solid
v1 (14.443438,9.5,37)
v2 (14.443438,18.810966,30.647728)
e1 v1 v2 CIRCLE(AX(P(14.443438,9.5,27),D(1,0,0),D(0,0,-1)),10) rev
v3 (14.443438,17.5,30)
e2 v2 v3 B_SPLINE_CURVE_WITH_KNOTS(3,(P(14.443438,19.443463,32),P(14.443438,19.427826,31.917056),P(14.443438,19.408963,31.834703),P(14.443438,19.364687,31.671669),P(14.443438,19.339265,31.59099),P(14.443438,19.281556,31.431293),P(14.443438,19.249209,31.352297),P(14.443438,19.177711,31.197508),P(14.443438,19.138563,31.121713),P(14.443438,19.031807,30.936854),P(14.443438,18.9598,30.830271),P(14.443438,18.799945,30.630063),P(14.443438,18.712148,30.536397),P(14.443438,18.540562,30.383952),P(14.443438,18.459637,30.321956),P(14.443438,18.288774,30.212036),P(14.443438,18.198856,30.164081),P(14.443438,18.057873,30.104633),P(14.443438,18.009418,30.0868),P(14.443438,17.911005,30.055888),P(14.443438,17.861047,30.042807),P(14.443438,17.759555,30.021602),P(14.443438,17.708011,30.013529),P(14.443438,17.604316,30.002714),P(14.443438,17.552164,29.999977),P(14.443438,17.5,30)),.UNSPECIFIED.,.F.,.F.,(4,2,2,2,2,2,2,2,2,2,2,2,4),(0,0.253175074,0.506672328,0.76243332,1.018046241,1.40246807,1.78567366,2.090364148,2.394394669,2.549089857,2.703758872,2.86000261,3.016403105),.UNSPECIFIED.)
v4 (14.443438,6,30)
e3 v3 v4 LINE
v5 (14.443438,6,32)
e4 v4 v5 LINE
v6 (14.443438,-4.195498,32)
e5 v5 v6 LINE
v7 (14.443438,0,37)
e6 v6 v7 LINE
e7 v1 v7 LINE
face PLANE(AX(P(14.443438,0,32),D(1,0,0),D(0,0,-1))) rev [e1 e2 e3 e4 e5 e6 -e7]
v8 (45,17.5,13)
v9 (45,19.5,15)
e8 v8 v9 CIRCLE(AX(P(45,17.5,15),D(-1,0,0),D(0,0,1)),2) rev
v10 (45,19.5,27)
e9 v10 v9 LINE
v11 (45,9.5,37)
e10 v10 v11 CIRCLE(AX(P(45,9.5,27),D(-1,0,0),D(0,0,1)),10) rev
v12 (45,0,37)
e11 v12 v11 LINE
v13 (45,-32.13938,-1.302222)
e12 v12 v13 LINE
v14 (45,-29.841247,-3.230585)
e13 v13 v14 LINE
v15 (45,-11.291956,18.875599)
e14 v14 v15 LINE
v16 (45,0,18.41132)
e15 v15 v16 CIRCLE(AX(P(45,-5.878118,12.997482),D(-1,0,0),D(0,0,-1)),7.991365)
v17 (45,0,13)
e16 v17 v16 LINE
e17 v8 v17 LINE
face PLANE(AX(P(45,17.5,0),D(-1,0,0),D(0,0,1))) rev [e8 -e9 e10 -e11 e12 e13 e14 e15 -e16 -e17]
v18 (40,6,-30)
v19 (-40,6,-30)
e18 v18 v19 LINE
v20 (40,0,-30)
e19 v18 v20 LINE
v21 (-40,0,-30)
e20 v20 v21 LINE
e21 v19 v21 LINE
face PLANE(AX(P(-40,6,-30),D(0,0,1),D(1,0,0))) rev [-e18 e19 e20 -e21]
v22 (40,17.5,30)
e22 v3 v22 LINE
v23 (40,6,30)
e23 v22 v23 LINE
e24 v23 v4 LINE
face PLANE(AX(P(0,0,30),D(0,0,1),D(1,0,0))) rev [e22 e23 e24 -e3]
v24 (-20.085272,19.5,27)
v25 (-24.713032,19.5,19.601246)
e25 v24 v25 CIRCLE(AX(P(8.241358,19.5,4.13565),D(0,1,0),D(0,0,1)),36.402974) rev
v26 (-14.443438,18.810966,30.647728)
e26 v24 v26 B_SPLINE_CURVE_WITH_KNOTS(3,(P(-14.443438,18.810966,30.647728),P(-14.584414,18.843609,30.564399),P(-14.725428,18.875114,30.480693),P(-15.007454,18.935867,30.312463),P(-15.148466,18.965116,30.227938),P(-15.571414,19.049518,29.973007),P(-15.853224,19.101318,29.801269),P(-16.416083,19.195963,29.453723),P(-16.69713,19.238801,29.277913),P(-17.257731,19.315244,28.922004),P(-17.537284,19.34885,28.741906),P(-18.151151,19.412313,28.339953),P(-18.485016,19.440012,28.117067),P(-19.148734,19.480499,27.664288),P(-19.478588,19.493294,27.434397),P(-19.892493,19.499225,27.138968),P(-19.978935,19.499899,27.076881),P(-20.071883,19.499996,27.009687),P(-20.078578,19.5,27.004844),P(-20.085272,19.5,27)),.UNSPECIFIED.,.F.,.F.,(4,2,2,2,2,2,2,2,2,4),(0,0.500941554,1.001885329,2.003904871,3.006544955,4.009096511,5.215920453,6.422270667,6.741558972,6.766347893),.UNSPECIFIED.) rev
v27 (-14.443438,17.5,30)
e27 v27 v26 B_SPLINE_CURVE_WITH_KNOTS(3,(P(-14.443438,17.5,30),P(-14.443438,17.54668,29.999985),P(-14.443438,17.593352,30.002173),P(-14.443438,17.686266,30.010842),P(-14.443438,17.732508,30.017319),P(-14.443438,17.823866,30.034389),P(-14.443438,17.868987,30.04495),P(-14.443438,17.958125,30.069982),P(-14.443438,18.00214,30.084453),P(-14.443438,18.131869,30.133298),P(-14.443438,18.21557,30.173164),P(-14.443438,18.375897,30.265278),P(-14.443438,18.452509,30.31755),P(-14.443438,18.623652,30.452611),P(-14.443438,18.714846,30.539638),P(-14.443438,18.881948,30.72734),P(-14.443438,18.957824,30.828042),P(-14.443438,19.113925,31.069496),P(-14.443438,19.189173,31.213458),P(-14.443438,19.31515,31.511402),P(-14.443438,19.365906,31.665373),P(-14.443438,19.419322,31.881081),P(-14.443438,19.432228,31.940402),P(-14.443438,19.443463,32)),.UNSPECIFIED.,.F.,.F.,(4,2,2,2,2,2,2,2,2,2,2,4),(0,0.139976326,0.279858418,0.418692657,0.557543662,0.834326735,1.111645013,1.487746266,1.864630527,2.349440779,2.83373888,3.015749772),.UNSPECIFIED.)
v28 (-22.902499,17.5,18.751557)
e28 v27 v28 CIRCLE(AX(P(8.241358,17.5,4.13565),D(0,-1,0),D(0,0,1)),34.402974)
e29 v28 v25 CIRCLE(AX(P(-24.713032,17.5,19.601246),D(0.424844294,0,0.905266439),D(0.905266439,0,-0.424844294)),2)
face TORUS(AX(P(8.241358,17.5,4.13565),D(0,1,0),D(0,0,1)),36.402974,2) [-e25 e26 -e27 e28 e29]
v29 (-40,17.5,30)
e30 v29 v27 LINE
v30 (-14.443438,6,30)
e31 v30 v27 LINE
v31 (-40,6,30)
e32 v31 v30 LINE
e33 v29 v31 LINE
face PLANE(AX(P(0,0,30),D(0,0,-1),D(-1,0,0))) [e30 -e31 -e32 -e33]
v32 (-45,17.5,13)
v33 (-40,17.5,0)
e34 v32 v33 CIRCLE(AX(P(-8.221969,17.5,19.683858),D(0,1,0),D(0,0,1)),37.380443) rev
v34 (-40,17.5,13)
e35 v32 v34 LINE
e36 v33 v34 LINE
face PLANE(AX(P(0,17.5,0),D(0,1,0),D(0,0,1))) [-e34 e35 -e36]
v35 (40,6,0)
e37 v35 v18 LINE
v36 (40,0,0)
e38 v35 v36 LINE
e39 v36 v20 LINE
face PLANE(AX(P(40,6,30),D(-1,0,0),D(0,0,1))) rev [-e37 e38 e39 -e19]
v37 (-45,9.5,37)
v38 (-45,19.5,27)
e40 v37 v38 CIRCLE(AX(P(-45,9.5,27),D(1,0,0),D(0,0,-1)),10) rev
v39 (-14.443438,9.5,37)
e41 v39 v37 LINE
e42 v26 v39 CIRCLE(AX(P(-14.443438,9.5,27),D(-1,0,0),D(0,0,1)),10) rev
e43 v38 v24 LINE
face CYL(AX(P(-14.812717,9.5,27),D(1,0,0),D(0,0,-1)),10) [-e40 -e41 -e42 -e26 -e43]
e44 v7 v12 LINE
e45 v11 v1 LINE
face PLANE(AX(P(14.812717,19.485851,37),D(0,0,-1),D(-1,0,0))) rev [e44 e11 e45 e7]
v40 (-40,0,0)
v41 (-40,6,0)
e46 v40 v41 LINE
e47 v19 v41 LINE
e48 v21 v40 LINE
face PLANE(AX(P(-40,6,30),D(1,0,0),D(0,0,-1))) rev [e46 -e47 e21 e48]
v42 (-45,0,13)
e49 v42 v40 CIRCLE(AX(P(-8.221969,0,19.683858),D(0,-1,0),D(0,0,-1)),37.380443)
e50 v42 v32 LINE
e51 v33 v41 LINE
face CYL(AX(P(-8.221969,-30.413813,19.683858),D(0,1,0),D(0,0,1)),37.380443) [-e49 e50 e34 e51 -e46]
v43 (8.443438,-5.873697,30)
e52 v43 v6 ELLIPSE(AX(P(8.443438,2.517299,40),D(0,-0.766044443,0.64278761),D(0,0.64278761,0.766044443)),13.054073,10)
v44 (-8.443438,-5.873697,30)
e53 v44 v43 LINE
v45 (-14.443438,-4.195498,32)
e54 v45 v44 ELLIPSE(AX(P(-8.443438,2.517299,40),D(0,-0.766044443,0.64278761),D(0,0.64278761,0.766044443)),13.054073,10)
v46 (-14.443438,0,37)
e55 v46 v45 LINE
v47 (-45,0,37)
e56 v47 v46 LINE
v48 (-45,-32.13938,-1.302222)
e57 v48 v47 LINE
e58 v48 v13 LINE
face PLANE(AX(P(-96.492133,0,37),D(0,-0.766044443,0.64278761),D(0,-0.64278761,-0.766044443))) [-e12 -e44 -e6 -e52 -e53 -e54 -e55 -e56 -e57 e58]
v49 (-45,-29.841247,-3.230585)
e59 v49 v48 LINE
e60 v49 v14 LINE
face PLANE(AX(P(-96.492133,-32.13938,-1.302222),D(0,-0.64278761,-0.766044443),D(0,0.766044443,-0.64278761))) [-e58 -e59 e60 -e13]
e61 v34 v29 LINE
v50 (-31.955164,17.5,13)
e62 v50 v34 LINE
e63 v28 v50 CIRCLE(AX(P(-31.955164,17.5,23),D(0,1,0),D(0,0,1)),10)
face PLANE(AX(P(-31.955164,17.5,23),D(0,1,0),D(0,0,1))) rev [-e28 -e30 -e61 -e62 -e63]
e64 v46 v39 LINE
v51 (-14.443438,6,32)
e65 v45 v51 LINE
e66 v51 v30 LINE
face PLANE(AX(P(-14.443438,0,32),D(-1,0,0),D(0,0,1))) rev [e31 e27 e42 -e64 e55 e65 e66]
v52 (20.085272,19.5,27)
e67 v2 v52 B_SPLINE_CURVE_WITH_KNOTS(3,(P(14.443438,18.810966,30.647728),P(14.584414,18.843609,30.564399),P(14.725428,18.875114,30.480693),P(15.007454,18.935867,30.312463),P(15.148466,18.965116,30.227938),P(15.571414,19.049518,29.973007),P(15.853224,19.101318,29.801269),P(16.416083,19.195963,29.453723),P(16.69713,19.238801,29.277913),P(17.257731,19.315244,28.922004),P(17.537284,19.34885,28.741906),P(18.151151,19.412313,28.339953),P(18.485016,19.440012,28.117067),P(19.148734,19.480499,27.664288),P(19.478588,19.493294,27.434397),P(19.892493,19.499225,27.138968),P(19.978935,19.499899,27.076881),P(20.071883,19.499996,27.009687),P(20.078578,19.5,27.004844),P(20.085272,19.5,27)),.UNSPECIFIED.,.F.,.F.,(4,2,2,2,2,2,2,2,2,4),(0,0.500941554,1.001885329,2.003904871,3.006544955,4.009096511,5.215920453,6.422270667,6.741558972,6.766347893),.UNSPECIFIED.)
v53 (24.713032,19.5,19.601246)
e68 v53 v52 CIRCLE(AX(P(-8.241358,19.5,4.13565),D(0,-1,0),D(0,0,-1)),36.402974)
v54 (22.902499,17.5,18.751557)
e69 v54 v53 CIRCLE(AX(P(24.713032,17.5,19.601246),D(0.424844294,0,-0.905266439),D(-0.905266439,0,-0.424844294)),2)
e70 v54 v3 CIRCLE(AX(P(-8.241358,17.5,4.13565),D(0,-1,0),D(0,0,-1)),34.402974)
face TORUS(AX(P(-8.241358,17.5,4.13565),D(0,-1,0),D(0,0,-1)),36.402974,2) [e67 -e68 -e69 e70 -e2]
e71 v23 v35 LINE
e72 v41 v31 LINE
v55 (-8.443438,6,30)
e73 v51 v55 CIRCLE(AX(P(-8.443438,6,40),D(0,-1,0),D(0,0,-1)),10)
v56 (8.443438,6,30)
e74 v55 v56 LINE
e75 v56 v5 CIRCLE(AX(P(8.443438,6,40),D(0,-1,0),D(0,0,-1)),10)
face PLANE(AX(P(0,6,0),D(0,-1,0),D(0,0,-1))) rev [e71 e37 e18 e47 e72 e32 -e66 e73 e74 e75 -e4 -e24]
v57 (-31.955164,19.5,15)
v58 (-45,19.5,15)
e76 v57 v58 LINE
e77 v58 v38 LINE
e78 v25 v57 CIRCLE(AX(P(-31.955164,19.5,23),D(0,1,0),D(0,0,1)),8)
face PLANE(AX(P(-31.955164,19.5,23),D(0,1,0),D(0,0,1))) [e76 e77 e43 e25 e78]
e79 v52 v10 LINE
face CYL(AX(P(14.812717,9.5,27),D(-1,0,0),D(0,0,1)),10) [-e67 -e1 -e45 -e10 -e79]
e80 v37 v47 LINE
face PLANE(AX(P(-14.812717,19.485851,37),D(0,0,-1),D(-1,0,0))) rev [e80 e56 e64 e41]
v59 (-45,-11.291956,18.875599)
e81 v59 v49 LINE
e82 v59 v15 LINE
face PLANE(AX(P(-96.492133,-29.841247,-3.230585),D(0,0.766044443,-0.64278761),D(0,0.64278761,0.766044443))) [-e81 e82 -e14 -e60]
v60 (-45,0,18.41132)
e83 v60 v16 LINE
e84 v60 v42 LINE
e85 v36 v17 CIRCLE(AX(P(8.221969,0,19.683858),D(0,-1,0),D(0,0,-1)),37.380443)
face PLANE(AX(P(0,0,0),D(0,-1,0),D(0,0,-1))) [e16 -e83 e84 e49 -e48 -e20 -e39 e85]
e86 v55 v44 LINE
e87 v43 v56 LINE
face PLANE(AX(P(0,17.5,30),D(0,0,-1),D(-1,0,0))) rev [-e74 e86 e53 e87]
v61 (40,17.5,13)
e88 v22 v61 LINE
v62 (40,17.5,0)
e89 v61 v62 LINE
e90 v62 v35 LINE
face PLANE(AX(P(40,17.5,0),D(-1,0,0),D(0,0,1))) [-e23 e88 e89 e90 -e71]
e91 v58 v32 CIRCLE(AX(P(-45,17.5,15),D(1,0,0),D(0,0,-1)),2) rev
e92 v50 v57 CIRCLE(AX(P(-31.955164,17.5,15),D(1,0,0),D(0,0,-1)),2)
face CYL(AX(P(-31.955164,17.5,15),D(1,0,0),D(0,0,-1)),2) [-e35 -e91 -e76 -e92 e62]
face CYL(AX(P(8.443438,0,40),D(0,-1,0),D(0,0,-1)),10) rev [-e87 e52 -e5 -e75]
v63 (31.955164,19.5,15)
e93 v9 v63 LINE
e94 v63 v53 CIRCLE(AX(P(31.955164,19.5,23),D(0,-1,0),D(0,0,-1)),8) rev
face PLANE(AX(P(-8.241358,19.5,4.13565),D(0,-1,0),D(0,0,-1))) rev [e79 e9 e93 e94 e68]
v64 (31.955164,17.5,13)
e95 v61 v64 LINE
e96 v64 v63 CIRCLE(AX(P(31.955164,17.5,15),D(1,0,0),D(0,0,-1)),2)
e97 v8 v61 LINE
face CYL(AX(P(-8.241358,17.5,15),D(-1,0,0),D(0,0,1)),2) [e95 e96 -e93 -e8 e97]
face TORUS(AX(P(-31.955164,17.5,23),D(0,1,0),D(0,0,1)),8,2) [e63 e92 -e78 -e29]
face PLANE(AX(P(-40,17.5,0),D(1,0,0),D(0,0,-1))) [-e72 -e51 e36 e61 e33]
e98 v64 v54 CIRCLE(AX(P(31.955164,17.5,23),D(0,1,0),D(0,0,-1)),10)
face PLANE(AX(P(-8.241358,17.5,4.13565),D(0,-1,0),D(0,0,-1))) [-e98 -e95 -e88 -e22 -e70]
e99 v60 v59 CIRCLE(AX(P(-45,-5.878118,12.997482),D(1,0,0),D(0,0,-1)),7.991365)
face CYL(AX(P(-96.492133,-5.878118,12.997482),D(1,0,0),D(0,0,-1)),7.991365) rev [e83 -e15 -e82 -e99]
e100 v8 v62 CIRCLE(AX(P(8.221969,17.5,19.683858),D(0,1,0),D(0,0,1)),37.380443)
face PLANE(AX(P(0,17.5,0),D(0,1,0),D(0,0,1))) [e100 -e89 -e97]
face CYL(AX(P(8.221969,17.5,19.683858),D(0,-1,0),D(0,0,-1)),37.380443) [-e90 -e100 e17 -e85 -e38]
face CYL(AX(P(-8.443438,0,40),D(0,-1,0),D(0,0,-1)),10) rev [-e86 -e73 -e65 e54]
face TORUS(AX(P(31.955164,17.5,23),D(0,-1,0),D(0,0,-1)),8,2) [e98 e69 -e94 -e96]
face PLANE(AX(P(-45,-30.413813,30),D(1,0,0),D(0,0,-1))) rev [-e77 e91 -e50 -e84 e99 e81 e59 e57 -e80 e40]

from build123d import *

# Parameters (mm, degrees)
SKETCH1_W           = 80
SKETCH1_H           = 60
BOSS_EXTRUDE1_DEPTH = 6
SKETCH2_W           = 5
SKETCH2_H           = 17
BOSS_EXTRUDE2_DEPTH = 11.5
BOSS_EXTRUDE3_DEPTH = 6
BOSS_EXTRUDE4_START = 6
BOSS_EXTRUDE4_DEPTH = 6
BOSS_EXTRUDE5_DEPTH = 2
SKETCH6_W           = 30.556561627
SKETCH6_H           = 19.5
BOSS_EXTRUDE6_DEPTH = 2
FILLET1_R           = 10
FILLET2_R           = 2
BOSS_EXTRUDE7_DEPTH = 5
BOSS_EXTRUDE8_DEPTH = 5
FILLET3_START       = -45
FILLET3_DEPTH       = 90
BOSS_EXTRUDE9_REACH = 101.243
CUT_EXTRUDE1_DEPTH  = 67.535252268


with BuildPart() as part:
    # Sketch1 → Boss-Extrude1 (new body)
    with BuildSketch(Plane(origin=(0, 0, 0), x_dir=(1, 0, 0), z_dir=(0, 1, 0))):
        Rectangle(SKETCH1_W, SKETCH1_H)
    extrude(amount=BOSS_EXTRUDE1_DEPTH)



with BuildPart() as body_2:
    # Sketch2 → Boss-Extrude2 (new body)
    with BuildSketch(Plane(origin=(0, 6, 0), x_dir=(1, 0, 0), z_dir=(0, 1, 0))):
        with BuildLine():
            Line((-45, -13), (-40, -13))
            Line((-40, -13), (-40, 0))
            ThreePointArc((-40, 0), (-43.110841292, -6.265061041), (-45, -13))
        make_face()
        with Locations((-42.5, -21.5)):
            Rectangle(SKETCH2_W, SKETCH2_H)
        with BuildLine():
            Line((40, 0), (40, -13))
            Line((40, -13), (45, -13))
            ThreePointArc((45, -13), (43.110841292, -6.265061041), (40, 0))
        make_face()
        with Locations((42.5, -21.5)):
            Rectangle(SKETCH2_W, SKETCH2_H)
    extrude(amount=BOSS_EXTRUDE2_DEPTH)


with BuildPart() as part_1:
    add(part.part)

    add(body_2.part)  # Boss-Extrude3 merges body 2
    # Sketch3 → Boss-Extrude3 (add)
    with BuildSketch(Plane.XZ.offset(-6)):
        with BuildLine():
            Line((-40, 0), (-40, 30))
            Line((-40, 30), (-45, 30))
            Line((-45, 30), (-45, 13))
            ThreePointArc((-45, 13), (-43.110841292, 6.265061041), (-40, 0))
        make_face()
    extrude(amount=BOSS_EXTRUDE3_DEPTH)

    # Sketch4 → Boss-Extrude4 (add)
    with BuildSketch(Plane.XZ.offset(-6).offset(BOSS_EXTRUDE4_START)):
        with BuildLine():
            Line((40, 30), (40, 0))
            ThreePointArc((40, 0), (43.110841292, 6.265061041), (45, 13))
            Line((45, 13), (45, 30))
            Line((45, 30), (40, 30))
        make_face()
    extrude(amount=-BOSS_EXTRUDE4_DEPTH)

    # Sketch5 → Boss-Extrude5 (add)
    with BuildSketch(Plane(origin=(0, 17.5, 0), x_dir=(1, 0, 0), z_dir=(0, 1, 0))):
        with BuildLine():
            Line((-14.443438373, -30), (-25, -30))
            Line((-25, -30), (-45, -30))
            Line((-45, -30), (-45, -13))
            Line((-45, -13), (-31.955163637, -13))
            ThreePointArc((-31.955163637, -13), (-26.592535057, -14.559489665), (-22.902499246, -18.751557058))
            ThreePointArc((-22.902499246, -18.751557058), (-19.254329924, -24.812974066), (-14.443438373, -30))
        make_face()
        with BuildLine():
            Line((45, -30), (45, -13))
            Line((45, -13), (31.955163637, -13))
            ThreePointArc((31.955163637, -13), (26.592535057, -14.559489665), (22.902499246, -18.751557058))
            ThreePointArc((22.902499246, -18.751557058), (19.254329924, -24.812974066), (14.443438373, -30))
            Line((14.443438373, -30), (25, -30))
            Line((25, -30), (45, -30))
        make_face()
    extrude(amount=BOSS_EXTRUDE5_DEPTH)

    # Sketch6 → Boss-Extrude6 (add)
    with BuildSketch(Plane.XY.offset(30)):
        with Locations((-29.721719186, 9.75)):
            Rectangle(SKETCH6_W, SKETCH6_H)
        with Locations((29.721719186, 9.75)):
            Rectangle(SKETCH6_W, SKETCH6_H)
    extrude(amount=BOSS_EXTRUDE6_DEPTH)

    # Fillet1
    # the kernel refuses this fillet: 10 mm, written as the material it adds along each edge
    with BuildSketch(Plane(origin=(14.443438373, 0, 30), x_dir=(-1, 0, 0), z_dir=(0, 1, 0))) as fillet1_piece_1:
        with BuildLine():
            CenterArc((6, 10), FILLET1_R, 233.130102354, 36.869897646)
            Line((0, 2), (0, 0))
            Line((0, 0), (6, 0))
        make_face()
    extrude(amount=6)
    with BuildSketch(Plane(origin=(-14.443438373, 0, 30), x_dir=(1, 0, 0), z_dir=(0, 1, 0))) as fillet1_piece_2:
        with BuildLine():
            CenterArc((6, -10), FILLET1_R, 90, 36.869897646)
            Line((0, -2), (0, 0))
            Line((0, 0), (6, 0))
        make_face()
    extrude(amount=6)

    # Fillet2
    fillet2_edges = [part_1.edges().sort_by_distance(p)[0] for p in [
        (38.477581818, 19.5, 13),
        (19.254329924, 19.5, 24.812974066),
        (-19.254329924, 19.5, 24.812974066),
        (-26.592535057, 19.5, 14.559489665),
        (26.592535057, 19.5, 14.559489665),
        (-38.477581818, 19.5, 13),
    ]]
    fillet(fillet2_edges, radius=FILLET2_R - 0.0001)  # a hair under: the kernel refuses the full size

    # Sketch7 → Boss-Extrude7 (add)
    with BuildSketch(Plane.XY.offset(32)):
        with BuildLine():
            Line((45, 19.5), (15.184151192, 19.5))
            add(Edge.make_bspline(
                [(15.184151192, 19.5), (14.93580845, 19.5), (14.688907154, 19.481115197), (14.443438373, 19.443462601)],
                knots=[0, 0, 0, 0, 1, 1, 1, 1], degree=3))
            Line((14.443438373, 19.443462601), (14.443438373, 6))
            Line((14.443438373, 6), (14.443438373, 0))
            Line((14.443438373, 0), (45, 0))
            Line((45, 0), (45, 19.5))
        make_face()
    extrude(amount=BOSS_EXTRUDE7_DEPTH)

    # Sketch8 → Boss-Extrude8 (add)
    with BuildSketch(Plane.XY.offset(32)):
        with BuildLine():
            Line((-14.443438373, 6), (-14.443438373, 19.443462601))
            add(Edge.make_bspline(
                [(-14.443438373, 19.443462601), (-14.688907154, 19.481115197), (-14.93580845, 19.5), (-15.184151192, 19.5)],
                knots=[0, 0, 0, 0, 1, 1, 1, 1], degree=3))
            Line((-15.184151192, 19.5), (-45, 19.5))
            Line((-45, 19.5), (-45, 0))
            Line((-45, 0), (-14.443438373, 0))
            Line((-14.443438373, 0), (-14.443438373, 6))
        make_face()
    extrude(amount=BOSS_EXTRUDE8_DEPTH)

    # Fillet3: read off the stored shape, not the designer's step
    # Fillet3 outline → Fillet3 (cut)
    with BuildSketch(Plane.YZ.offset(FILLET3_START)):
        with BuildLine():
            Line((19.5, 37), (9.5, 37))
            ThreePointArc((9.5, 37), (16.571067812, 34.071067812), (19.5, 27))
            Line((19.5, 27), (19.5, 37))
        make_face()
    extrude(amount=FILLET3_DEPTH, mode=Mode.SUBTRACT)

    # Boss-Extrude9: up to this face of the body (flat: up to its plane)
    boss_extrude9_end = Plane(part_1.part.faces().sort_by_distance((-45, 9.370161856, 24.55198813))[0])
    # Sketch9 → Boss-Extrude9 (add, up to the picked face)
    with BuildSketch(Plane(origin=(45, 0, 0), x_dir=(0, 0, -1), z_dir=(1, 0, 0)), mode=Mode.PRIVATE) as boss_extrude9_sk1:
        with BuildLine():
            Line((-37, 0), (-18.411320002, 0))
            ThreePointArc((-18.411320002, 0), (-20.982100343, -5.549822615), (-18.87559935, -11.291956033))
            Line((-18.87559935, -11.291956033), (3.230584985, -29.841247155))
            Line((3.230584985, -29.841247155), (1.302222156, -32.139380484))
            Line((1.302222156, -32.139380484), (-37, 0))
        make_face()
    boss_extrude9_tool1 = split(extrude(boss_extrude9_sk1.sketch, amount=-BOSS_EXTRUDE9_REACH, mode=Mode.PRIVATE), bisect_by=boss_extrude9_end, keep=Keep.BOTH, mode=Mode.PRIVATE)
    add(boss_extrude9_tool1.solids().sort_by(Axis((45, -11.881572, 18.599139), (-1, 0, 0)))[0])

    # Sketch10 → Cut-Extrude1 (cut, through all)
    with BuildSketch(Plane(origin=(0, 0, 0), x_dir=(1, 0, 0), z_dir=(0, 1, 0))):
        with BuildLine():
            Line((-14.443438373, -37), (14.443438373, -37))
            Line((14.443438373, -37), (14.443438373, -32))
            ThreePointArc((14.443438373, -32), (11.605716034, -30.513167019), (8.443438373, -30))
            Line((8.443438373, -30), (-8.443438373, -30))
            ThreePointArc((-8.443438373, -30), (-11.605716034, -30.513167019), (-14.443438373, -32))
            Line((-14.443438373, -32), (-14.443438373, -37))
        make_face()
    extrude(amount=-CUT_EXTRUDE1_DEPTH, mode=Mode.SUBTRACT)


solid = part_1.part
